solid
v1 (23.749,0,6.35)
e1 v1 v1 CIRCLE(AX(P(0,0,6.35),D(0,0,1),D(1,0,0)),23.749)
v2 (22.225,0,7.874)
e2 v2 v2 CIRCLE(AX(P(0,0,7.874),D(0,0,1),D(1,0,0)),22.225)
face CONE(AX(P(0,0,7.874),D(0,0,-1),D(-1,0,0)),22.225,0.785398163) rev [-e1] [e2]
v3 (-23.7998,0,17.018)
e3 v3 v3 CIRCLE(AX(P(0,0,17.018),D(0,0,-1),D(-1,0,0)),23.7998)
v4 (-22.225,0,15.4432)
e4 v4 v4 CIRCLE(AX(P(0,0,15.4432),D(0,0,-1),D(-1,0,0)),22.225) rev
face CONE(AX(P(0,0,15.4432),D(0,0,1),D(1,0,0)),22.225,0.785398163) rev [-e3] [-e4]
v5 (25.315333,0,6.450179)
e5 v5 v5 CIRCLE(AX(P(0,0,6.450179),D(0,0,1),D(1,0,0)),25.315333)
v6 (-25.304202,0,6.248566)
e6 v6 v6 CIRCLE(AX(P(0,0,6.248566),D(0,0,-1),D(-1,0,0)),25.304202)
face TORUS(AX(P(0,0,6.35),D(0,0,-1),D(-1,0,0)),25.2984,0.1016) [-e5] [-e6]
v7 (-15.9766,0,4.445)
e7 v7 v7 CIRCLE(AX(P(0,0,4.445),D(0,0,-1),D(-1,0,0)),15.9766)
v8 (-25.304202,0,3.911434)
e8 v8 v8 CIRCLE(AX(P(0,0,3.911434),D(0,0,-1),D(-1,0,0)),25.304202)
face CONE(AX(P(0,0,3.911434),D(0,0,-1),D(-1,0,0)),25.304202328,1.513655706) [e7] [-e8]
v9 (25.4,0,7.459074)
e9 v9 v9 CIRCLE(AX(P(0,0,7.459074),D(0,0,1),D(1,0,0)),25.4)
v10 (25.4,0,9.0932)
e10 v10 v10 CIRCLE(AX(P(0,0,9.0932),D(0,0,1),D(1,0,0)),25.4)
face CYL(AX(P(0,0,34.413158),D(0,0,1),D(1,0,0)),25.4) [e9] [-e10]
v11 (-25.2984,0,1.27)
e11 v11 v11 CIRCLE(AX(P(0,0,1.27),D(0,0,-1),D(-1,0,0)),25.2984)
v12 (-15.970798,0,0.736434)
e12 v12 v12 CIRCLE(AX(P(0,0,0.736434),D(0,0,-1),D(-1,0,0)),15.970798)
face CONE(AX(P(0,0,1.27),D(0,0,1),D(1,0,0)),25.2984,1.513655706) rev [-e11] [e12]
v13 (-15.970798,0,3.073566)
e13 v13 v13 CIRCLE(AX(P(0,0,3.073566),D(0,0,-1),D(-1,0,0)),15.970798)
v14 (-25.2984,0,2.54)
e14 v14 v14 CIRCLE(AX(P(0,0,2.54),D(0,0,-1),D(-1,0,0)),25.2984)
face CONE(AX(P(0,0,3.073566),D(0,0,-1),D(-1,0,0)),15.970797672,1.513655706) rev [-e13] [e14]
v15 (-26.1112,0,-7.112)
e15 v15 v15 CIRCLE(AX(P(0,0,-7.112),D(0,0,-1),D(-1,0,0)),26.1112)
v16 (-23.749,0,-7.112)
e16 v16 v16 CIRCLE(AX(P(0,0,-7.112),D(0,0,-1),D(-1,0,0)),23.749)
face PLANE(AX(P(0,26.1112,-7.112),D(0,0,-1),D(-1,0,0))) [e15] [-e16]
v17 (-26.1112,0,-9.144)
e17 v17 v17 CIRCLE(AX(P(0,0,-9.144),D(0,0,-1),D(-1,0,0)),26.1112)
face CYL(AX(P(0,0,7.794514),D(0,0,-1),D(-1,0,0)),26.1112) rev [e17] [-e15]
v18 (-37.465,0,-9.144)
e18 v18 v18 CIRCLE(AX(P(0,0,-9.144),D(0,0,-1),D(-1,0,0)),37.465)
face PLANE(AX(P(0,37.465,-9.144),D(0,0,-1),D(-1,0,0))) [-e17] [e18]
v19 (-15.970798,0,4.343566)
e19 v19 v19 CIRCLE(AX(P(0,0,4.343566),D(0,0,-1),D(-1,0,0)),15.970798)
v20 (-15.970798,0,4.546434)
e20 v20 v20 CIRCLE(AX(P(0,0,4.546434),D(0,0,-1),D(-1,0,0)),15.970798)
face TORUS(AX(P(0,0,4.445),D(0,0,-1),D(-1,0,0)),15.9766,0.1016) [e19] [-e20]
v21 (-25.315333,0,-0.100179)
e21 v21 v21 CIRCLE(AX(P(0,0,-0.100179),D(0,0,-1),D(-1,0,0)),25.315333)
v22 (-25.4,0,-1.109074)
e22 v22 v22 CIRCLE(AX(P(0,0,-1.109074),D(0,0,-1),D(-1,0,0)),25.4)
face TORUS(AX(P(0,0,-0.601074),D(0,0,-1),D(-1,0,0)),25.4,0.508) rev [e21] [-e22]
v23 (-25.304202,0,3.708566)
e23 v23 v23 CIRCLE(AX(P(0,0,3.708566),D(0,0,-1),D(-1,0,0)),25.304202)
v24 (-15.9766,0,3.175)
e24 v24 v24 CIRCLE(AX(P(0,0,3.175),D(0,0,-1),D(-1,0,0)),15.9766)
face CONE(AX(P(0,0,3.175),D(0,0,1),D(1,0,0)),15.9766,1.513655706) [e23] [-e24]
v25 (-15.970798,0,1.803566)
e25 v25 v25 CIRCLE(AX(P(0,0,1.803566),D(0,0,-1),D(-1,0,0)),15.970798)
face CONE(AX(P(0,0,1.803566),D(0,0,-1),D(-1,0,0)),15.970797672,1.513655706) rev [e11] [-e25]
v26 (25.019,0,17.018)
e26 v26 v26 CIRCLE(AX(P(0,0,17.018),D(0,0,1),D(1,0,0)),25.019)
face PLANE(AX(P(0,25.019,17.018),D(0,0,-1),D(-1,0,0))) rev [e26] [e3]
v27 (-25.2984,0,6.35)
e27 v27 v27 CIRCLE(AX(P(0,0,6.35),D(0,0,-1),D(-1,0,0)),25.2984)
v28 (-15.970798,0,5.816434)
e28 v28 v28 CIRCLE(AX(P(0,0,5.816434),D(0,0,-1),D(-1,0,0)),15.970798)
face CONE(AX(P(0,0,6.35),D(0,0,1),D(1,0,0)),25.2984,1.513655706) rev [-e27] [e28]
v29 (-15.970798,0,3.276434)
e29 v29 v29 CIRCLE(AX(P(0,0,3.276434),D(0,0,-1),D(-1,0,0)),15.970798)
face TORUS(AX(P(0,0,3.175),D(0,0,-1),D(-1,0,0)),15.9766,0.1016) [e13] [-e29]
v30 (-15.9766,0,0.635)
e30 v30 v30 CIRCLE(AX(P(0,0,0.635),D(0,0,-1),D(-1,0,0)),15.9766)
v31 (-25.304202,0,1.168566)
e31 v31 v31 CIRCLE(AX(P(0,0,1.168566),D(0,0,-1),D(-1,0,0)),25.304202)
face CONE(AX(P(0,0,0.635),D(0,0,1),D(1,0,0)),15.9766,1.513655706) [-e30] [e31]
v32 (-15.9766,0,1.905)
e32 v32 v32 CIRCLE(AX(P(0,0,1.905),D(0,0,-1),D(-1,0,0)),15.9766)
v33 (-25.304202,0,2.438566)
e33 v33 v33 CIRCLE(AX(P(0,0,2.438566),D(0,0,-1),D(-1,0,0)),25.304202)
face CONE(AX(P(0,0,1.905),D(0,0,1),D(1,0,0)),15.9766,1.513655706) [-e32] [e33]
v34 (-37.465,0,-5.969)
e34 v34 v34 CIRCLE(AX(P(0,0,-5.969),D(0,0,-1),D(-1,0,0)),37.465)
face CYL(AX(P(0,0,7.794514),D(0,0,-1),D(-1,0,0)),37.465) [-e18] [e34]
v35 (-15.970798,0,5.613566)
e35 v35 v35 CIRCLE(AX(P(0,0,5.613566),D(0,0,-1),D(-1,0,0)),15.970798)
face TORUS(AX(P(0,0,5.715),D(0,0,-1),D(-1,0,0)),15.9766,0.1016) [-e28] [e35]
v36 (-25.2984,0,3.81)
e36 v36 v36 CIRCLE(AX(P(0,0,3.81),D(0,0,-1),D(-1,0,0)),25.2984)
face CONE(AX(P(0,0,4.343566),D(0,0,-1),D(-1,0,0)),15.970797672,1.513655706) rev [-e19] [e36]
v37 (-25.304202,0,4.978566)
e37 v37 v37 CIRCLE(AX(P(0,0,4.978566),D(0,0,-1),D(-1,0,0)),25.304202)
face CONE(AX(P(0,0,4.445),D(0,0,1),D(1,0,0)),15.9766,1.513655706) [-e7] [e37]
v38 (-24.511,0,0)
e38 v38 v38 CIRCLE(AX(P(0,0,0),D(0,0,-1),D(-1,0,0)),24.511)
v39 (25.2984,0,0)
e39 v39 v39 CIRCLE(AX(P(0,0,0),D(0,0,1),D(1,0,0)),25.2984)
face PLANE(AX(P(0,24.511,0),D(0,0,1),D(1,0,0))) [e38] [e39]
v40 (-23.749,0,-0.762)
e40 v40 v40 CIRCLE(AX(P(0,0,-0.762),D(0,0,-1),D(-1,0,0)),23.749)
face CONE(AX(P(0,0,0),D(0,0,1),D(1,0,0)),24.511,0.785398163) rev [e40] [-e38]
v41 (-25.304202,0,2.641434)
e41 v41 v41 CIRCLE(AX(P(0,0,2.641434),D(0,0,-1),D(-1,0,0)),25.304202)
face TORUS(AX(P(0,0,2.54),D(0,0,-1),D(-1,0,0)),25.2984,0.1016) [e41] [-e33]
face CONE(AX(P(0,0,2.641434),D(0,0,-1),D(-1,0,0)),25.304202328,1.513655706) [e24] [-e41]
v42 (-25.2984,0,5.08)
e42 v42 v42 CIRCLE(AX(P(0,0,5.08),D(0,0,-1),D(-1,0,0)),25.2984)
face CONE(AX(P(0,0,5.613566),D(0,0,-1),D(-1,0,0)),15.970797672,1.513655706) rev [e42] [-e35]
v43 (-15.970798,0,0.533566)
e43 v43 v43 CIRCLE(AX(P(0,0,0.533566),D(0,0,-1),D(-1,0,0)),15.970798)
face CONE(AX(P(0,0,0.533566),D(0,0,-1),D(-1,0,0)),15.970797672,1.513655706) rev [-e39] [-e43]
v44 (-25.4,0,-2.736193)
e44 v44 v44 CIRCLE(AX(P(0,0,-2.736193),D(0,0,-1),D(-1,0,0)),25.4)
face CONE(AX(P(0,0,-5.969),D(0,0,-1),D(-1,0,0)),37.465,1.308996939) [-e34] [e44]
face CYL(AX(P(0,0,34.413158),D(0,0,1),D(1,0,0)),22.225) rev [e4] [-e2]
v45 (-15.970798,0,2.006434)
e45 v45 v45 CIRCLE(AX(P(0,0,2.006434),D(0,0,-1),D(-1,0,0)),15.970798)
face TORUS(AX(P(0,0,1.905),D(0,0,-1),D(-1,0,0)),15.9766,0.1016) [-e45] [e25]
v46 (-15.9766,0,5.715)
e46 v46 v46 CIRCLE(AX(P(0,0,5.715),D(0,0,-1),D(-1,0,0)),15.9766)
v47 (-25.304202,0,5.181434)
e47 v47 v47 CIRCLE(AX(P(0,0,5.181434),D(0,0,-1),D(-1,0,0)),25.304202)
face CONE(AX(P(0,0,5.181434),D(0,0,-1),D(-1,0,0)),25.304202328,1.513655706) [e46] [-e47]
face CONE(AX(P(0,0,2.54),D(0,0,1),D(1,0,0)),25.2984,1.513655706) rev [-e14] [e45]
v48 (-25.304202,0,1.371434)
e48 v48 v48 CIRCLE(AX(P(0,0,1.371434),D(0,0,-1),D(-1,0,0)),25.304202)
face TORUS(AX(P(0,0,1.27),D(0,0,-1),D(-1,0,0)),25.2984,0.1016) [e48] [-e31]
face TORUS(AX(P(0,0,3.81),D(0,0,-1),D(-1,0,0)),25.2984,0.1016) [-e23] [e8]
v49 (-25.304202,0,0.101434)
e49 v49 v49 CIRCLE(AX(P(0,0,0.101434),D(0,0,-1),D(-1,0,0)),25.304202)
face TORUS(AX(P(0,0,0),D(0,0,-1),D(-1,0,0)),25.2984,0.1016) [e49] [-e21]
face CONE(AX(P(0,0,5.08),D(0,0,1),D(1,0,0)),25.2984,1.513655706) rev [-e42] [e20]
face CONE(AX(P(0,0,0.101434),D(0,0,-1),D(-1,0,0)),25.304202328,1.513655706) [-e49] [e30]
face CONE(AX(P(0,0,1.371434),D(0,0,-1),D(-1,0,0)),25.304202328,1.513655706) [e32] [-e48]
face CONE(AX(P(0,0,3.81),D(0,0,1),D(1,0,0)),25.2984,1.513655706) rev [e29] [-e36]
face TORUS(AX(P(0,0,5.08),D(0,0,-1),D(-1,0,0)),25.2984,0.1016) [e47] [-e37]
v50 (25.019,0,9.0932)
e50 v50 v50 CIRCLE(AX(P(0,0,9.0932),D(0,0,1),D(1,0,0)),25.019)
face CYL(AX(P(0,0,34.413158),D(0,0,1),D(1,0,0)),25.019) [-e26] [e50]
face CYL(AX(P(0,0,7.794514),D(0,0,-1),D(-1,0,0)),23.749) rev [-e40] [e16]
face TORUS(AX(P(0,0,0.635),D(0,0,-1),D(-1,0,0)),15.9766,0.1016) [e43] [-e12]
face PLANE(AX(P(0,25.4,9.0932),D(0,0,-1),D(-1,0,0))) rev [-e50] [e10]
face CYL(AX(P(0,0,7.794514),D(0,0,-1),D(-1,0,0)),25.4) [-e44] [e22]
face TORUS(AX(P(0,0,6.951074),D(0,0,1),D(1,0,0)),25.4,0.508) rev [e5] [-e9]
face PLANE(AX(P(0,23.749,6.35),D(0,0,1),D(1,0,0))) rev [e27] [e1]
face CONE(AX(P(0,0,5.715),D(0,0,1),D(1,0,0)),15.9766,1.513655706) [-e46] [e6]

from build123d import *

# Parameters (mm, degrees)
LPATTERN1_COUNT = 5
LPATTERN1_PITCH = 1.27
CHAMFER1_SIZE   = 1.5748


with BuildPart() as part:
    # Sketch2 → Revolve1 (revolve)
    with BuildSketch(Plane(origin=(0, 0, 0), x_dir=(0, 0, -1), z_dir=(1, 0, 0))):
        with BuildLine():
            Line((0, 25.4), (0, 25.2984))
            Line((0, 25.2984), (-0.533565819, 15.970797672))
            ThreePointArc((-0.533565819, 15.970797672), (-0.635, 15.875), (-0.736434181, 15.970797672))
            Line((-0.736434181, 15.970797672), (-1.27, 25.2984))
            Line((-1.27, 25.2984), (-1.27, 25.4))
            ThreePointArc((-1.27, 25.4), (-1.20023954, 25.372265), (-1.168565819, 25.304202328))
            Line((-1.168565819, 25.304202328), (-0.635, 15.9766))
            Line((-0.635, 15.9766), (-0.101434181, 25.304202328))
            ThreePointArc((-0.101434181, 25.304202328), (-0.06976046, 25.372265), (0, 25.4))
        make_face()
    revolve1 = revolve(axis=Axis((0, 0, 7.794513673), (0, 0, 1)))

    # LPattern1: Revolve1 ×5
    with Locations(*[(0, 0, i * LPATTERN1_PITCH) for i in range(1, LPATTERN1_COUNT)]):
        add(revolve1)

    # Sketch8 → Revolve4 (revolve)
    with BuildSketch(Plane(origin=(0, 0, 0), x_dir=(0, 0, -1), z_dir=(1, 0, 0))):
        with BuildLine():
            Line((1.109073706, 25.4), (2.736192993, 25.4))
            Line((2.736192993, 25.4), (5.969, 37.465))
            Line((5.969, 37.465), (9.144, 37.465))
            Line((9.144, 37.465), (9.144, 26.1112))
            Line((9.144, 26.1112), (7.112, 26.1112))
            Line((7.112, 26.1112), (7.112, 23.749))
            Line((7.112, 23.749), (0.762, 23.749))
            Line((0.762, 23.749), (0, 24.511))
            Line((0, 24.511), (0, 25.4))
            ThreePointArc((0, 25.4), (0.065582518, 25.375998282), (0.100178951, 25.315333333))
            ThreePointArc((0.100178951, 25.315333333), (0.643555846, 24.893779428), (1.109073706, 25.4))
        make_face()
    revolve(axis=Axis((0, 0, 7.794513673), (0, 0, 1)))

    # Sketch9 → Revolve5 (revolve)
    with BuildSketch(Plane(origin=(0, 0, 0), x_dir=(0, 0, -1), z_dir=(1, 0, 0))):
        with BuildLine():
            Line((-6.35, 23.749), (-7.874, 22.225))
            Line((-7.874, 22.225), (-17.018, 22.225))
            Line((-17.018, 22.225), (-17.018, 25.019))
            Line((-17.018, 25.019), (-9.0932, 25.019))
            Line((-9.0932, 25.019), (-9.0932, 25.4))
            Line((-9.0932, 25.4), (-7.459073706, 25.4))
            ThreePointArc((-7.459073706, 25.4), (-6.993555846, 24.893779428), (-6.450178951, 25.315333333))
            ThreePointArc((-6.450178951, 25.315333333), (-6.415582518, 25.375998282), (-6.35, 25.4))
            Line((-6.35, 25.4), (-6.35, 23.749))
        make_face()
    revolve(axis=Axis((0, 0, 34.413158008), (0, 0, -1)))

    # Chamfer1
    chamfer1_edges = [part.edges().sort_by_distance(p)[0] for p in [
        (0, -22.225, 17.018),
    ]]
    chamfer(chamfer1_edges, length=CHAMFER1_SIZE)


solid = part.part
